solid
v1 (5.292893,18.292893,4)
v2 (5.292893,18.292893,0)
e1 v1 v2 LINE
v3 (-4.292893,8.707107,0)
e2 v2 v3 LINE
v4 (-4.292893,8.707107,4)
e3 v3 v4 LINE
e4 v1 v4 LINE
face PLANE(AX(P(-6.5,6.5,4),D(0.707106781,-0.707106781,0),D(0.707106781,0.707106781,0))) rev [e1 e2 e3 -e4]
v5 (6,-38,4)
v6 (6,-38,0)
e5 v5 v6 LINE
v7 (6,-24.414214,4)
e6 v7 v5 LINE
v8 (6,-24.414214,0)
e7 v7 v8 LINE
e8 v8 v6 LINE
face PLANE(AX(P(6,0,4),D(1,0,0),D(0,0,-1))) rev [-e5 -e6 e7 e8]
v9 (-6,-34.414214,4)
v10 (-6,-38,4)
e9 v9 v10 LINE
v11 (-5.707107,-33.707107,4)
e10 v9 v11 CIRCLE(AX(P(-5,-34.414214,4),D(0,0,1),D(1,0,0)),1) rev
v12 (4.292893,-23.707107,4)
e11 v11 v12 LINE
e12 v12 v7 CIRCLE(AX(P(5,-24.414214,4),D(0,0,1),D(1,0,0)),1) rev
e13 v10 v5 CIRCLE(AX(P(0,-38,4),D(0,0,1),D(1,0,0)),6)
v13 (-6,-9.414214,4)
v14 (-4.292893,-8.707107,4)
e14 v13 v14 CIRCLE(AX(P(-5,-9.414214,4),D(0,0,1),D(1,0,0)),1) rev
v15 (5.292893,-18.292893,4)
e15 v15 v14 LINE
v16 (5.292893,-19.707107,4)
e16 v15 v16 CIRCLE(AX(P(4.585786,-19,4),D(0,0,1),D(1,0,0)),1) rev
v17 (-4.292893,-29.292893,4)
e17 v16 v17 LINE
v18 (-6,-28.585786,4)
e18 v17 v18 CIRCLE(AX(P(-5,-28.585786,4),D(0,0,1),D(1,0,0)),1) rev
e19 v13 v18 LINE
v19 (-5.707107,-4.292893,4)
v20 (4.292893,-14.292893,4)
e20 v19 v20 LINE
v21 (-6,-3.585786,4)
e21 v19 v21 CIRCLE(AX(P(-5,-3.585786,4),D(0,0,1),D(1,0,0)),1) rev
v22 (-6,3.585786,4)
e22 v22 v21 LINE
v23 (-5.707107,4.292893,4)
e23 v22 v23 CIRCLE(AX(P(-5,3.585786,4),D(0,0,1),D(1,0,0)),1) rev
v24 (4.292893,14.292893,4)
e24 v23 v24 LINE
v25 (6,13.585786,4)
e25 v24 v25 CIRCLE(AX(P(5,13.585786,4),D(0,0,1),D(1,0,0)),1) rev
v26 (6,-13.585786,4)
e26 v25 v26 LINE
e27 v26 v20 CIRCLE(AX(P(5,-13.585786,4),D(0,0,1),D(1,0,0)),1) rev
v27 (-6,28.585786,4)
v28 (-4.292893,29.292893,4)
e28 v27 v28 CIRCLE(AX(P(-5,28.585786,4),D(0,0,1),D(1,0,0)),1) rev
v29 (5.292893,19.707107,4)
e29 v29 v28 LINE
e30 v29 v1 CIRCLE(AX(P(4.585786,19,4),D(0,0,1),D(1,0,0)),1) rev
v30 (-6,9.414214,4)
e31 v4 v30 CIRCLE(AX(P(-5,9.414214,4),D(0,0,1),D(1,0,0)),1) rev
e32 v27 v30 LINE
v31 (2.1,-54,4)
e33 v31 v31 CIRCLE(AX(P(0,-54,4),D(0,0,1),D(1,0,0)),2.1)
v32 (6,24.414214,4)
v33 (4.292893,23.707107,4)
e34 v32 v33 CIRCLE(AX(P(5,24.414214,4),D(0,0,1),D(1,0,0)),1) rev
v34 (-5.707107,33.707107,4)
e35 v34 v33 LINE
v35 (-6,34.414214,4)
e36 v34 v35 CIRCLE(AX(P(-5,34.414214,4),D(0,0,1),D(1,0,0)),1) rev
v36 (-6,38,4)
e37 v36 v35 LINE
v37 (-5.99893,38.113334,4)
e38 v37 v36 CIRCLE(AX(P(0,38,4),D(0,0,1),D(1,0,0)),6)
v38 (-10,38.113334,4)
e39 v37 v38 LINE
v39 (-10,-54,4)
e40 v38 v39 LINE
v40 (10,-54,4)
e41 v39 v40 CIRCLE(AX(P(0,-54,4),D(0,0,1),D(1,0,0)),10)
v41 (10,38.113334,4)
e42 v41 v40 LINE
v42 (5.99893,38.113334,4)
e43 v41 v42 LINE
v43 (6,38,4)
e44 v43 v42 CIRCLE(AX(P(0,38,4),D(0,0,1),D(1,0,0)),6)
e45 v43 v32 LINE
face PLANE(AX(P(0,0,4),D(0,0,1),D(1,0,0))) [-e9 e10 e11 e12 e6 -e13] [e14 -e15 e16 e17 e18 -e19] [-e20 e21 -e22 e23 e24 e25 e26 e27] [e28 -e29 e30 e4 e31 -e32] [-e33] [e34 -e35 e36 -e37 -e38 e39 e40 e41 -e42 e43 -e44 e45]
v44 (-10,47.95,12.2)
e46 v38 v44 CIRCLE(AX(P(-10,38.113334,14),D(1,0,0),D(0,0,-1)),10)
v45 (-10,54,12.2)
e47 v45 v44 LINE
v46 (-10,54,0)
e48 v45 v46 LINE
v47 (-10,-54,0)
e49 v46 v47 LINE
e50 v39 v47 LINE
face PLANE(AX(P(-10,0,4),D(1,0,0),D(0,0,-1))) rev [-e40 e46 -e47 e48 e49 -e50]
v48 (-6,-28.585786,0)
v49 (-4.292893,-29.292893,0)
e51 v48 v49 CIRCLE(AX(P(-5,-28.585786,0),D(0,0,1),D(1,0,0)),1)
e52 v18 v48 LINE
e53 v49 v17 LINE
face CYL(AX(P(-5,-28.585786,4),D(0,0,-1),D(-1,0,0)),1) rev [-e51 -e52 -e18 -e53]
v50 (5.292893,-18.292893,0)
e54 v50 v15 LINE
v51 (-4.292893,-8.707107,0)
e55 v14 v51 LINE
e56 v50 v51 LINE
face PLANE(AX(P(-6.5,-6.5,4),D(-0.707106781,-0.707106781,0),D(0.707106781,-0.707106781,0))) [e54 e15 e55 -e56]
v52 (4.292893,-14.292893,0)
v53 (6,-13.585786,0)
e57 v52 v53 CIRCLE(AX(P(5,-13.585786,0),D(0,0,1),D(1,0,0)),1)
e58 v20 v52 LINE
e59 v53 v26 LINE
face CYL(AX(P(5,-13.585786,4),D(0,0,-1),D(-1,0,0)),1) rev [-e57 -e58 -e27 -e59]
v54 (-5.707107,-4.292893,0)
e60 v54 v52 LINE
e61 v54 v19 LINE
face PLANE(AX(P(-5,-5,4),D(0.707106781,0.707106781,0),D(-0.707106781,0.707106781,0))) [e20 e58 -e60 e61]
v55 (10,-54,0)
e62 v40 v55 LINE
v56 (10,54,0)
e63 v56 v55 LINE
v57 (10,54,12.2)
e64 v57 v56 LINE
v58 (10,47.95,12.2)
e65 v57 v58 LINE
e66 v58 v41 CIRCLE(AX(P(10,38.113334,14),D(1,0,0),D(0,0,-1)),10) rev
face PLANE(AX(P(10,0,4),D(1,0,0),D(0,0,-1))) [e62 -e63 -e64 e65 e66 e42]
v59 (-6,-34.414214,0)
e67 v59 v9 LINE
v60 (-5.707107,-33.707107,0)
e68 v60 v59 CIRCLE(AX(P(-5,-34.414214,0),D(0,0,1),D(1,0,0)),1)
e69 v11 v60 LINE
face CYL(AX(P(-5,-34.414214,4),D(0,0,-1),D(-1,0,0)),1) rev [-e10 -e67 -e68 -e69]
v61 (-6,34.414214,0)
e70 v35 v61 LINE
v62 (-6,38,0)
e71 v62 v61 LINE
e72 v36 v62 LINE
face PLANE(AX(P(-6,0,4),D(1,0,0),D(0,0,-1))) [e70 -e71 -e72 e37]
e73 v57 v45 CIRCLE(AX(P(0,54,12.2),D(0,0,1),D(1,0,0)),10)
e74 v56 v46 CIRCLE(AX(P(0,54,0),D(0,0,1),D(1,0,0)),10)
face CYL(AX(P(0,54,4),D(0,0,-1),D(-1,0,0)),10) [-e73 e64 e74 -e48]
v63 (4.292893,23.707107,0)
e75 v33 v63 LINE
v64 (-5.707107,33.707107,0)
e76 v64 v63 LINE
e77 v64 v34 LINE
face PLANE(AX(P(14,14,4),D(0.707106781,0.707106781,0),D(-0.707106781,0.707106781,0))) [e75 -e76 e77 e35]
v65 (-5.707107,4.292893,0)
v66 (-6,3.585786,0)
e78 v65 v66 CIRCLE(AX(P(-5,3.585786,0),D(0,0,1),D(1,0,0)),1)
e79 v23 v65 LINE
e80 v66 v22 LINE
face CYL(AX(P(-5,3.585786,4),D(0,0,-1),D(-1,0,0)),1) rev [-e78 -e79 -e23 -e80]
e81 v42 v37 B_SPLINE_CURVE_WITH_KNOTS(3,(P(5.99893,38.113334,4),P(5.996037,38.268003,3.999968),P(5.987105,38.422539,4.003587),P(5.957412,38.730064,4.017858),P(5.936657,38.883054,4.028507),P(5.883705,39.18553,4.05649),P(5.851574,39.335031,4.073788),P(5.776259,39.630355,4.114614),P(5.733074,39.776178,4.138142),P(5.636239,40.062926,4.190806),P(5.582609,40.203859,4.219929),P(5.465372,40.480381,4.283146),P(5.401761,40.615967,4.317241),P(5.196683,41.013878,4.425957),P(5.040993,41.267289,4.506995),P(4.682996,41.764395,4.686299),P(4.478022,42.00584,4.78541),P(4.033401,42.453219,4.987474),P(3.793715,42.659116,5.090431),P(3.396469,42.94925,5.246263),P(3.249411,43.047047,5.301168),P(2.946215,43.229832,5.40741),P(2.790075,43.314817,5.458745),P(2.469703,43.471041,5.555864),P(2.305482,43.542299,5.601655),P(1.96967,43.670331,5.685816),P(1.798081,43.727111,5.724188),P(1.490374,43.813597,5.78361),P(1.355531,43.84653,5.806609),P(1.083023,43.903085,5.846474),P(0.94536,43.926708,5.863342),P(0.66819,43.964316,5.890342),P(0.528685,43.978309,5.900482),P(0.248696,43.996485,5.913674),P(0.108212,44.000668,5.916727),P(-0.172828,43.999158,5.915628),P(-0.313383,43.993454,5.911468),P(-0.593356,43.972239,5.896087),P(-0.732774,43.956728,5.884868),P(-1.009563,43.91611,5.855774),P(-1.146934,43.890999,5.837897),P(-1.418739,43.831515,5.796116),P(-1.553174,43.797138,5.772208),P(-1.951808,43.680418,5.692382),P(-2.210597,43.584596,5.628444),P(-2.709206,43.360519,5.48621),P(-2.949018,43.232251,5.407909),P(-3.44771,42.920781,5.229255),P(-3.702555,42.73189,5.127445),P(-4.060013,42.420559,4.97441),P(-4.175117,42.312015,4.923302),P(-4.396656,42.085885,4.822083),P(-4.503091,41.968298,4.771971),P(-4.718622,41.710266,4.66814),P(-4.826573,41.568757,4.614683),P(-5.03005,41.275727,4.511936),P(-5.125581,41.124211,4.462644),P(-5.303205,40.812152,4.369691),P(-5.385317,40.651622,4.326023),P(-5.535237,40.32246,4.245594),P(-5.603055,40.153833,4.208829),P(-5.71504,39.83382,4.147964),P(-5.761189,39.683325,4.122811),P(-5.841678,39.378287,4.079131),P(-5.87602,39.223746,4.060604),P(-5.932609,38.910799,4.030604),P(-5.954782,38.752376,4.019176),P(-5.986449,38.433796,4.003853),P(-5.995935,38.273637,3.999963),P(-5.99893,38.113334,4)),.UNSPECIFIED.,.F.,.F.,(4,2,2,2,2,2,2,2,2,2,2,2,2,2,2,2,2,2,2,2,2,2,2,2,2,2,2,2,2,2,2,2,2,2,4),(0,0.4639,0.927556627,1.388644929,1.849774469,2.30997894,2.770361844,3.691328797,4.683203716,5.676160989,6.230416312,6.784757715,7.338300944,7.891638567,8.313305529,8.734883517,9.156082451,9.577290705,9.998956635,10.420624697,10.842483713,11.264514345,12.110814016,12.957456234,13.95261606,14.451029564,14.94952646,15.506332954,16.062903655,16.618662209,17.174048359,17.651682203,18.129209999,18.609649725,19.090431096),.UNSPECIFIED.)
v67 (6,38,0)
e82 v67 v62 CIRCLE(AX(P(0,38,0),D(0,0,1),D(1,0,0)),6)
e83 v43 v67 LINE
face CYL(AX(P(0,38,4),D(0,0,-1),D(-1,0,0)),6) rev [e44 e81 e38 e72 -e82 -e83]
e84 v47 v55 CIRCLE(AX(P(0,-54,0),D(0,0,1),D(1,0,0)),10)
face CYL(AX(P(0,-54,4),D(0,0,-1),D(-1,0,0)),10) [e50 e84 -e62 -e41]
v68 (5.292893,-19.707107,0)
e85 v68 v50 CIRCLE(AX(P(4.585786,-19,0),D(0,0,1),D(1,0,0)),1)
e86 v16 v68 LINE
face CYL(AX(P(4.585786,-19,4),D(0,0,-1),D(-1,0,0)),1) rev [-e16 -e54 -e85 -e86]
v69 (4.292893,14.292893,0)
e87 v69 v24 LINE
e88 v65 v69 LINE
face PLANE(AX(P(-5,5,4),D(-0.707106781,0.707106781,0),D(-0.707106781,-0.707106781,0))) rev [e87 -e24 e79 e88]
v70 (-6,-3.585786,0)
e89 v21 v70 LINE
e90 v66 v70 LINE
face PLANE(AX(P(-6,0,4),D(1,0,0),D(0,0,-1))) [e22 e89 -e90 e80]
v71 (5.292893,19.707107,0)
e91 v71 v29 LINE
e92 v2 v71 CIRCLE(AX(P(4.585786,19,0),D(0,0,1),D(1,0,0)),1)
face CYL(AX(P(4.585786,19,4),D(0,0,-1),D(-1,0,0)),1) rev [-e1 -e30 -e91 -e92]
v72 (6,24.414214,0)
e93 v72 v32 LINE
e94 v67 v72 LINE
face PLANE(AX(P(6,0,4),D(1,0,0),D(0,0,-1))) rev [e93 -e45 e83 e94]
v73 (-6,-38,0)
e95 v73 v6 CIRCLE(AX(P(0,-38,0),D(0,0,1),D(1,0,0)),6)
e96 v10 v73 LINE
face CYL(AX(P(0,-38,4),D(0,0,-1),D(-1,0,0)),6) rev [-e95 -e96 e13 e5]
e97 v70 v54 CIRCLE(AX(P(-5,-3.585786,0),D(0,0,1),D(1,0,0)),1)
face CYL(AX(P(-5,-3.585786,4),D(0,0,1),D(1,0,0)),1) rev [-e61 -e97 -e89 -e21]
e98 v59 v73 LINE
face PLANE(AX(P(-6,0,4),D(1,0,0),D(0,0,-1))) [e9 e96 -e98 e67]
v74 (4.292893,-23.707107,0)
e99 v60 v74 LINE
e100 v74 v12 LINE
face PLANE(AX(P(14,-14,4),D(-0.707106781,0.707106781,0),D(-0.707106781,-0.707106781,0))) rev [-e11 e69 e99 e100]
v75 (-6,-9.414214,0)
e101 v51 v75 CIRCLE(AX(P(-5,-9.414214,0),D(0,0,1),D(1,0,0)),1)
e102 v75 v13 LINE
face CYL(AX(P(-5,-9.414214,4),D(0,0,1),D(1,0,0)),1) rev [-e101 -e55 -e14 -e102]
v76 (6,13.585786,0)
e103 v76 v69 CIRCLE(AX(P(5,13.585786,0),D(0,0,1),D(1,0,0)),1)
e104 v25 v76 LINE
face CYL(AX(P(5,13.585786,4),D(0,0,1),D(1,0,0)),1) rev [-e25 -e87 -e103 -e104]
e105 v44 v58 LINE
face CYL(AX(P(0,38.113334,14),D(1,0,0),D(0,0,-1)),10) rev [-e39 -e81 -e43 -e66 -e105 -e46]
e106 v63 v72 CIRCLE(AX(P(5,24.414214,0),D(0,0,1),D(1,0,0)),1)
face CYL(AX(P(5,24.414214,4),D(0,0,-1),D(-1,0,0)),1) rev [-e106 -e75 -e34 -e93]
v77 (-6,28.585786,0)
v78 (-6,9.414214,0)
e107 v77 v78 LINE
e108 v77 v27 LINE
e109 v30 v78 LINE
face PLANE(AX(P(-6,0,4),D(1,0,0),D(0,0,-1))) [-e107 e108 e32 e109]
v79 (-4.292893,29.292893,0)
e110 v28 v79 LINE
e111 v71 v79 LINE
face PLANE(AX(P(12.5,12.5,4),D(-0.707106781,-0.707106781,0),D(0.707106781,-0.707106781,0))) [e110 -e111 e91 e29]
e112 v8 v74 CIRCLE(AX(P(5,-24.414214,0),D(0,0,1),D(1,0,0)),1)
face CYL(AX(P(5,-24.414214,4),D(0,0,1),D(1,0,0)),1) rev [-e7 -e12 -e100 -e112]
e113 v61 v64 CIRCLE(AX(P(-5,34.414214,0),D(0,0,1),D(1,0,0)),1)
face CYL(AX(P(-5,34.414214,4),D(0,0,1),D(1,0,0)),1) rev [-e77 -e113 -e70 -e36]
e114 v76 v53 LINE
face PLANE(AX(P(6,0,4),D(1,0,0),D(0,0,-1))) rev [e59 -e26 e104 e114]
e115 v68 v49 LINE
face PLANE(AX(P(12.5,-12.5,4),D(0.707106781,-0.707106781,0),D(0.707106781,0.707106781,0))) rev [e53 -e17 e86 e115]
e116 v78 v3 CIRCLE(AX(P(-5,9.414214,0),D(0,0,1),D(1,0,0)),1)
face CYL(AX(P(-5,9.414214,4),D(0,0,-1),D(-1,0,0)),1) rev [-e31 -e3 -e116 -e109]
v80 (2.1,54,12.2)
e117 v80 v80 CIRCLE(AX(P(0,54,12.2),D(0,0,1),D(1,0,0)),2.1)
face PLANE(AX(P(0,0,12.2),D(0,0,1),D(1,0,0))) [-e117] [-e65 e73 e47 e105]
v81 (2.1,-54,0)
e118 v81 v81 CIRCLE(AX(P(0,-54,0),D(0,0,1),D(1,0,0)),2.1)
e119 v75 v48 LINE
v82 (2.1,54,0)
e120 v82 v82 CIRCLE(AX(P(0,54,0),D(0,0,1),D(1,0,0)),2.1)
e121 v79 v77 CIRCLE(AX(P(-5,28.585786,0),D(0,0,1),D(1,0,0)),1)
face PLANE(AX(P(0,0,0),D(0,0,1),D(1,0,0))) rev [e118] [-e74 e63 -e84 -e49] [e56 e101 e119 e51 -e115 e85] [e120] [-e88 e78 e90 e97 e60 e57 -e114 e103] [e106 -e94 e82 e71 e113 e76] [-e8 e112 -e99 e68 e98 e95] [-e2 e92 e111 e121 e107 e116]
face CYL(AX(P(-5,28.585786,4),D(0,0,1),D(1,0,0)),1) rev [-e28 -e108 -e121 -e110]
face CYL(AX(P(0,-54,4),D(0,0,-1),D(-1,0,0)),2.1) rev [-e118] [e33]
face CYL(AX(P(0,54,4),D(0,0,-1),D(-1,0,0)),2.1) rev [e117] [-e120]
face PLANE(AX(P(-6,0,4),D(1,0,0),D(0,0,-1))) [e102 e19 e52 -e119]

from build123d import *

# Parameters (mm, degrees)
CROQUIS1_R              = 2.1
SALIENTE_EXTRUIR1_DEPTH = 4
CROQUIS1_6_R            = 2.1
SALIENTE_EXTRUIR3_DEPTH = 12.2
REDONDEO1_R             = 10
REDONDEO2_R             = 1


with BuildPart() as part:
    # Croquis1 → Saliente-Extruir1 (new body)
    with BuildSketch(Plane.XY):
        with BuildLine():
            ThreePointArc((10, 54), (0, 64), (-10, 54))
            Line((-10, 54), (-10, -54))
            ThreePointArc((-10, -54), (0, -64), (10, -54))
            Line((10, -54), (10, 54))
        make_face()
        with Locations((0, 54)):
            Circle(CROQUIS1_R, mode=Mode.SUBTRACT)
        with BuildLine():
            Line((6, 38), (6, 22))
            Line((6, 22), (-6, 34))
            Line((-6, 34), (-6, 38))
            ThreePointArc((-6, 38), (0, 44), (6, 38))
        make_face(mode=Mode.SUBTRACT)
        Polygon((6, 16), (6, -16), (-6, -4), (-6, 4), align=None, mode=Mode.SUBTRACT)
        with BuildLine():
            Line((6, -22), (6, -38))
            ThreePointArc((6, -38), (0, -44), (-6, -38))
            Line((-6, -38), (-6, -34))
            Line((-6, -34), (6, -22))
        make_face(mode=Mode.SUBTRACT)
        Polygon((-6, -31), (-6, -7), (6, -19), align=None, mode=Mode.SUBTRACT)
        Polygon((-6, 7), (-6, 31), (6, 19), align=None, mode=Mode.SUBTRACT)
        with Locations((0, -54)):
            Circle(CROQUIS1_R, mode=Mode.SUBTRACT)
    extrude(amount=SALIENTE_EXTRUIR1_DEPTH)

    # Croquis1<6> → Saliente-Extruir3 (add)
    with BuildSketch(Plane.XY):
        with BuildLine():
            Line((10, 47.95), (10, 54))
            ThreePointArc((10, 54), (0, 64), (-10, 54))
            Line((-10, 54), (-10, 47.95))
            Line((-10, 47.95), (10, 47.95))
        make_face()
        with Locations((0, 54)):
            Circle(CROQUIS1_6_R, mode=Mode.SUBTRACT)
    extrude(amount=SALIENTE_EXTRUIR3_DEPTH)

    # Redondeo1
    # the kernel refuses this fillet: 10 mm, written as the material it adds along each edge
    with BuildSketch(Plane(origin=(10, 47.95, 4), x_dir=(0, 0, 1), z_dir=(-1, 0, 0))) as redondeo1_piece_1_section:
        with BuildLine():
            CenterArc((10, -9.836666102), REDONDEO1_R, 100.369759805, 79.630240195)
            Line((0, -9.836666102), (-0.2, -9.836666102))
            Line((-0.2, -9.836666102), (-0.2, 0))
            Line((-0.2, 0), (0, 0.2))
            ThreePointArc((0, 0.2), (4.1, 0.2), (8.164, 0.196733322))
            Line((8.164, 0.196733322), (8.2, 0))
        make_face()
    redondeo1_piece_1 = extrude(amount=20, mode=Mode.PRIVATE)
    redondeo1_piece_1 = redondeo1_piece_1 - Plane(origin=(0, 38, 6.176378177), x_dir=(-1, 0, 0), z_dir=(0, 0, -1)) * Cylinder(6, 80, mode=Mode.PRIVATE)
    add(redondeo1_piece_1)

    # Redondeo2
    redondeo2_edges = [part.edges().sort_by_distance(p)[0] for p in [
        (6, 22, 2),
        (-6, 34, 2),
        (6, -22, 2),
        (-6, -34, 2),
        (-6, -31, 2),
        (6, -19, 2),
        (-6, -7, 2),
        (-6, -4, 2),
        (6, -16, 2),
        (6, 16, 2),
        (-6, 4, 2),
        (-6, 7, 2),
        (6, 19, 2),
        (-6, 31, 2),
    ]]
    fillet(redondeo2_edges, radius=REDONDEO2_R)


solid = part.part
